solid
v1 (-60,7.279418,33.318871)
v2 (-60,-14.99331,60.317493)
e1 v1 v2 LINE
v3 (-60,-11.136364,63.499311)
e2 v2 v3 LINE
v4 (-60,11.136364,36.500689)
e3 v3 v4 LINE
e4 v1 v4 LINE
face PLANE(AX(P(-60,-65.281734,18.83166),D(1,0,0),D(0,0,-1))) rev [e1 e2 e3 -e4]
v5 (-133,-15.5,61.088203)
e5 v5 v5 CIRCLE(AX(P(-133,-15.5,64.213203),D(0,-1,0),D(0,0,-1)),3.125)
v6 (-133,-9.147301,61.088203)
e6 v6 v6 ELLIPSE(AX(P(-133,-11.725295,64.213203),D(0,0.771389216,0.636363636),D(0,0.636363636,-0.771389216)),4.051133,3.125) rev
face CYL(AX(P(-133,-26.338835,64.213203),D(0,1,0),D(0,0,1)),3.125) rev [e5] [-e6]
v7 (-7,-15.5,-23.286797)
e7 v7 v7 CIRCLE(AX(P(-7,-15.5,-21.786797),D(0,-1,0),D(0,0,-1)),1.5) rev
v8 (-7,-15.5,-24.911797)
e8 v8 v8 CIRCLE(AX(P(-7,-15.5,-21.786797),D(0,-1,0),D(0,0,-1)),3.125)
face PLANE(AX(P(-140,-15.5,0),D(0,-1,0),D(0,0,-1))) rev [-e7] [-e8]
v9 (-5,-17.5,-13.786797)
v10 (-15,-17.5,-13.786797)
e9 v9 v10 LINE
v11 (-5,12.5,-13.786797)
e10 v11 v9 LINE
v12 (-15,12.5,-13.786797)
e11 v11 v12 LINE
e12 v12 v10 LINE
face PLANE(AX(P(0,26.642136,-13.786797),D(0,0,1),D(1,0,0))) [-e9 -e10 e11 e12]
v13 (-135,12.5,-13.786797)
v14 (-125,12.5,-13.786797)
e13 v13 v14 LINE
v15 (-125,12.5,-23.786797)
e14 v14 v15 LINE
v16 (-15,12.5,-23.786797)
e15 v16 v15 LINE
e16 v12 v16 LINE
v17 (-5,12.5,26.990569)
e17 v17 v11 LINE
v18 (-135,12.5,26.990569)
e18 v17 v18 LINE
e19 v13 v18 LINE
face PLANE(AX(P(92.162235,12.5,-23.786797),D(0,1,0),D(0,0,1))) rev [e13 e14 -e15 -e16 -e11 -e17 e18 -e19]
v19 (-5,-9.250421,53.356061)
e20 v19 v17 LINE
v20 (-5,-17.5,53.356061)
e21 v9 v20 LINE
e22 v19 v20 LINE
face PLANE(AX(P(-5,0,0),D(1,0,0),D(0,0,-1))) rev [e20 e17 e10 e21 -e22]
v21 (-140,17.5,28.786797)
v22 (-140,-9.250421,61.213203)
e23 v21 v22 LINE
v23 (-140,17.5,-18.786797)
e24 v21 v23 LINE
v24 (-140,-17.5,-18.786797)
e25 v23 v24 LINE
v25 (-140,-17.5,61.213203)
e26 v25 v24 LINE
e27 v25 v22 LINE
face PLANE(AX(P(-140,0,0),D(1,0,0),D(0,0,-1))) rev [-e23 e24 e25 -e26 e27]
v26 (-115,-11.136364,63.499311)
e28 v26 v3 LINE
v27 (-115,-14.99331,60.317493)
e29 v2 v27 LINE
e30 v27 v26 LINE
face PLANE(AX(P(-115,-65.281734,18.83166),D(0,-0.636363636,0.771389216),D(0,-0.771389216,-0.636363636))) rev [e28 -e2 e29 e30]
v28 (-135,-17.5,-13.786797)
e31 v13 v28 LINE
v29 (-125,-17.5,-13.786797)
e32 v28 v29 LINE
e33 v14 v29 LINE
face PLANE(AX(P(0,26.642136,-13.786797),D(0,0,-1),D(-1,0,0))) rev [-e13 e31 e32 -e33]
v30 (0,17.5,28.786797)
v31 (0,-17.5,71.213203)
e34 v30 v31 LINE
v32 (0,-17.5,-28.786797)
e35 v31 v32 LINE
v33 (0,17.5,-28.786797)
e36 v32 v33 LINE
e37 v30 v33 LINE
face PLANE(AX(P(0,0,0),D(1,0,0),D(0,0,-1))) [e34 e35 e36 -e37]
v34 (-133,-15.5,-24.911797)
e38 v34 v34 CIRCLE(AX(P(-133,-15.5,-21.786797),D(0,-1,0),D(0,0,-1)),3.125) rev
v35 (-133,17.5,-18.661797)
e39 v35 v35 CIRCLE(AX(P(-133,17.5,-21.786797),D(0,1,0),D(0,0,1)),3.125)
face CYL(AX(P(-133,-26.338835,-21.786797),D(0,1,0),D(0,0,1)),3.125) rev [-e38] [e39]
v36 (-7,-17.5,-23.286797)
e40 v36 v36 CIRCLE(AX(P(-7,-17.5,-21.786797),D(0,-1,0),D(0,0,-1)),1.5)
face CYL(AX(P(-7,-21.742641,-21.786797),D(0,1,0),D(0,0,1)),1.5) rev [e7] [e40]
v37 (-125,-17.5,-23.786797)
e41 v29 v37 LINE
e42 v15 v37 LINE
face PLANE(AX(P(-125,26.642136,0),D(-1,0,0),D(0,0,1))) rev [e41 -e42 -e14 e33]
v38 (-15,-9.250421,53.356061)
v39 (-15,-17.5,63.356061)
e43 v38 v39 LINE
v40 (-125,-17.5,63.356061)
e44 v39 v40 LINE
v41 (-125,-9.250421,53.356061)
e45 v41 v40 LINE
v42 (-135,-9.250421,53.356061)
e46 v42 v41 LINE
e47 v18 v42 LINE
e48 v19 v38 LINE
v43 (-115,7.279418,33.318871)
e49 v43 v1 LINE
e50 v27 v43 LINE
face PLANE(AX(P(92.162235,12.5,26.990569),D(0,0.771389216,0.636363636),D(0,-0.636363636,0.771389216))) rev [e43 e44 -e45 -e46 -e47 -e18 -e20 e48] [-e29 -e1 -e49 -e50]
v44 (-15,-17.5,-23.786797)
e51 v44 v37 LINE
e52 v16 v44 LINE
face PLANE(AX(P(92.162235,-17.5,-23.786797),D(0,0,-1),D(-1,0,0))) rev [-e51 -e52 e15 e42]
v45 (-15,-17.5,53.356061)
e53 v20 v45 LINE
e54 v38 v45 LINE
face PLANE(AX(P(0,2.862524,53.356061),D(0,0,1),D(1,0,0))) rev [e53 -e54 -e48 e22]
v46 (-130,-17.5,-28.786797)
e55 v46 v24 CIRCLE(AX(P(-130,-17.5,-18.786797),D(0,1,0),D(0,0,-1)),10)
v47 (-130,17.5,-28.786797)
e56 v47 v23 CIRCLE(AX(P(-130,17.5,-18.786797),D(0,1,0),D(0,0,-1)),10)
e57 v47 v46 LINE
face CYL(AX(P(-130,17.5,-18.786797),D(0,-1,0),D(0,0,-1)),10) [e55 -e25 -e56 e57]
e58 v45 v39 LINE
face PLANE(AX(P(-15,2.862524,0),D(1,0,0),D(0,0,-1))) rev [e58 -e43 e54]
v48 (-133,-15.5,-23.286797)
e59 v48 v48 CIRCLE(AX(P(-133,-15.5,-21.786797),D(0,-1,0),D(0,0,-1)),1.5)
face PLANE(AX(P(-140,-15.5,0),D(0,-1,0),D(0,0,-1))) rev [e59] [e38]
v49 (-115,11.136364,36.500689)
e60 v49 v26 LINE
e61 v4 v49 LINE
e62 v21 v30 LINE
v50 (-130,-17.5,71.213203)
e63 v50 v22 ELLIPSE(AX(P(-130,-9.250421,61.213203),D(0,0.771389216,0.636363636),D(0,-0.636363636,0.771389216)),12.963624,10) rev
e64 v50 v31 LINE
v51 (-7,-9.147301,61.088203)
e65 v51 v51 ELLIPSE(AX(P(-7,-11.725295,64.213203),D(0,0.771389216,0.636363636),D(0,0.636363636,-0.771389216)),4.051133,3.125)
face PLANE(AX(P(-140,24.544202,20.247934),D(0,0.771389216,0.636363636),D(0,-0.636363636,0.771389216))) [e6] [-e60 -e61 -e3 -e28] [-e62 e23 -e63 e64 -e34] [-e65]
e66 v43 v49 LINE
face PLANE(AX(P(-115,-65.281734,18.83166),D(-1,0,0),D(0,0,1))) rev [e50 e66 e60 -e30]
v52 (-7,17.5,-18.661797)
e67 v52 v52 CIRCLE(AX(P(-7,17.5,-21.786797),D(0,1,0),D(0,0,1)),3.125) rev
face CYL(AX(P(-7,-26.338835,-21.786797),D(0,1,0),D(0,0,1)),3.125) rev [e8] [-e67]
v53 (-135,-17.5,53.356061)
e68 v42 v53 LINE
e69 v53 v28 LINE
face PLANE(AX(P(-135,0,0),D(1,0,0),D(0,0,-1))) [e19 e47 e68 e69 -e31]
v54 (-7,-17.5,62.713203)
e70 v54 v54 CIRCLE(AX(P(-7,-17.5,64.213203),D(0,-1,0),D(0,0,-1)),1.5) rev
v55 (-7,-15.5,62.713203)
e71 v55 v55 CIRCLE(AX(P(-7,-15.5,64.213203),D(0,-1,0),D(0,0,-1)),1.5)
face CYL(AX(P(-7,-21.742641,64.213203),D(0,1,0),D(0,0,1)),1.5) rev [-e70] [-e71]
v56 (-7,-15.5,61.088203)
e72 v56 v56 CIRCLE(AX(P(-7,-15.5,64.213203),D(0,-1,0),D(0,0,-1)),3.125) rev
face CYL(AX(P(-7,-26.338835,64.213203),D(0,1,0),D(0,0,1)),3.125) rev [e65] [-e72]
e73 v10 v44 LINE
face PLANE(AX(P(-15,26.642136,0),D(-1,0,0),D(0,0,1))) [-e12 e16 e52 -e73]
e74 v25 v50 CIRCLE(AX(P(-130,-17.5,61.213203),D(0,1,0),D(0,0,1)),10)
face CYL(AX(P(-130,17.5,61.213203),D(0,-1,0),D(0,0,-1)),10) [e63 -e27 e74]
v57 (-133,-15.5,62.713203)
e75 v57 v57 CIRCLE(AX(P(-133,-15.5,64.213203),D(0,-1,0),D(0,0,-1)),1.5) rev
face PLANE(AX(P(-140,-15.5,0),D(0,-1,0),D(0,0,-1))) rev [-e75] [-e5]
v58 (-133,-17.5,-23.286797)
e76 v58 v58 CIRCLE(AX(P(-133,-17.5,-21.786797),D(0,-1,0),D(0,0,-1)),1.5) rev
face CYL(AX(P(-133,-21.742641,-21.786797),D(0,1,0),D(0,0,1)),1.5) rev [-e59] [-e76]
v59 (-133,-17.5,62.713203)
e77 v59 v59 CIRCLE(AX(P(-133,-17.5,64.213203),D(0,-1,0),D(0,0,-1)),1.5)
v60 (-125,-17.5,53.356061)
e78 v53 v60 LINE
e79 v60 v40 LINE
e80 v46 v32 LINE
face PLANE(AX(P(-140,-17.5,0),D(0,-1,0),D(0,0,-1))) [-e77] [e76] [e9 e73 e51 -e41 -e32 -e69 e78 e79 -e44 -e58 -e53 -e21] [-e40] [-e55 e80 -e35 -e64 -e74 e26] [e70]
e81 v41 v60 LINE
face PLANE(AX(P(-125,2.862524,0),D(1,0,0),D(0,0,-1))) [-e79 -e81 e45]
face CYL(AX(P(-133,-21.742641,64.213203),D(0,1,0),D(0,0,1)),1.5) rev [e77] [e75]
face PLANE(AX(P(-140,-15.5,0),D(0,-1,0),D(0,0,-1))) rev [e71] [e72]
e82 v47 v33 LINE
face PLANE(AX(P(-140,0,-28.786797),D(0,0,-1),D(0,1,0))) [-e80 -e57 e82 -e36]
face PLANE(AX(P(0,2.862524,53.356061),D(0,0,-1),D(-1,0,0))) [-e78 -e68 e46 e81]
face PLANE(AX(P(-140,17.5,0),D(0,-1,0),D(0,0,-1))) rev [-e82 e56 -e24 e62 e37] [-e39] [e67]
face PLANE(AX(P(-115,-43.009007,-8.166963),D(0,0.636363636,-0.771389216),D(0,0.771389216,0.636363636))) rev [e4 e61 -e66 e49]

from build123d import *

# Parameters (mm, degrees)
SKETCH2_W               = 57.573593128
SKETCH2_H               = 35
BOSS_EXTRUDE1_DEPTH     = 140
CUT_EXTRUDE1_DEPTH      = 65
CUT_EXTRUDE1_DEPTH_BACK = 65
SKETCH4_W               = 55
SKETCH4_H               = 35
CUT_EXTRUDE2_DEPTH      = 5
CUT_EXTRUDE3_DEPTH      = 161.923336852
BOSS_EXTRUDE2_START     = -135
BOSS_EXTRUDE2_DEPTH     = 10
BOSS_EXTRUDE2_START_2   = -15
BOSS_EXTRUDE2_2_DEPTH   = 10
SKETCH8_3_W             = 10
SKETCH8_3_H             = 10
BOSS_EXTRUDE3_DEPTH     = 30
SKETCH7_R               = 3.125
SKETCH7_R_2             = 1.5
CUT_EXTRUDE5_DEPTH      = 33
SKETCH7_4_R             = 1.5
CUT_EXTRUDE6_DEPTH      = 35


# Read off the part's stored shape, not the designer's step: Boss-Extrude2
with BuildPart() as part:
    # Sketch2 → Boss-Extrude1 (new body)
    with BuildSketch(Plane(origin=(0, 0, 0), x_dir=(0, 0, -1), z_dir=(1, 0, 0))):
        Polygon((-28.786796564, 17.5), (-71.213203436, -17.5), (-28.786796564, -17.5), align=None)
        Rectangle(SKETCH2_W, SKETCH2_H)
        Polygon((-26.990568975, 12.5), (-28.786796564, 11.018187839), (-28.786796564, -17.5), (23.786796564, -17.5), (23.786796564, 12.5), align=None)
        Polygon((-28.786796564, -17.5), (-28.786796564, 11.018187839), (-63.356060578, -17.5), align=None)
    extrude(amount=-BOSS_EXTRUDE1_DEPTH)

    # Sketch3 → Cut-Extrude1 (cut, two sides: drawn at the far end of the back side and taken through both)
    with BuildSketch(Plane.ZY.offset(70).offset(-CUT_EXTRUDE1_DEPTH_BACK)):
        Polygon((-23.786796564, -17.5), (-23.786796564, 12.5), (26.990568975, 12.5), (63.356060578, -17.5), align=None)
    extrude(amount=CUT_EXTRUDE1_DEPTH + CUT_EXTRUDE1_DEPTH_BACK, mode=Mode.SUBTRACT)

    # Sketch4 → Cut-Extrude2 (cut)
    with BuildSketch(Plane(origin=(0, 24.544202322, 20.247933884), x_dir=(1, 0, 0), z_dir=(0, 0.77138921583987, 0.6363636363636365))):
        with Locations((-87.5, -38.569460792)):
            Rectangle(SKETCH4_W, SKETCH4_H)
    extrude(amount=-CUT_EXTRUDE2_DEPTH, mode=Mode.SUBTRACT)

    # Sketch6 → Cut-Extrude3 (cut, through all)
    with BuildSketch(Plane.XZ.offset(17.5)):
        with BuildLine():
            Line((-140, 61.213203436), (-140, 71.213203436))
            Line((-140, 71.213203436), (-130, 71.213203436))
            ThreePointArc((-130, 71.213203436), (-137.071067812, 68.284271247), (-140, 61.213203436))
        make_face()
        with BuildLine():
            Line((-140, -18.786796564), (-140, -28.786796564))
            Line((-140, -28.786796564), (-130, -28.786796564))
            ThreePointArc((-130, -28.786796564), (-137.071067812, -25.857864376), (-140, -18.786796564))
        make_face()
    extrude(amount=-CUT_EXTRUDE3_DEPTH, mode=Mode.SUBTRACT)

    # Boss-Extrude2 outline → Boss-Extrude2 (add)
    with BuildSketch(Plane.YZ.offset(BOSS_EXTRUDE2_START)):
        Polygon((-9.250420886, 53.356060578), (-17.5, 63.356060578), (-17.5, 53.356060578), align=None)
    extrude(amount=BOSS_EXTRUDE2_DEPTH)

    # Boss-Extrude2 2 outline → Boss-Extrude2 2 (add)
    with BuildSketch(Plane.YZ.offset(BOSS_EXTRUDE2_START_2)):
        Polygon((-9.250420886, 53.356060578), (-17.5, 63.356060578), (-17.5, 53.356060578), align=None)
    extrude(amount=BOSS_EXTRUDE2_2_DEPTH)

    # Sketch8<3> → Boss-Extrude3 (add)
    with BuildSketch(Plane.XZ.offset(17.5)):
        with Locations((-130, -18.786796564)):
            Rectangle(SKETCH8_3_W, SKETCH8_3_H)
        with Locations((-10, -18.786796564)):
            Rectangle(SKETCH8_3_W, SKETCH8_3_H)
    extrude(amount=-BOSS_EXTRUDE3_DEPTH)

    # Sketch7 → Cut-Extrude5 (cut)
    # profile 1 of 4: a face of its own
    with BuildSketch(Plane(origin=(0, 17.5, 0), x_dir=(1, 0, 0), z_dir=(0, 1, 0))):
        with Locations(Location((-133, 21.786796564, 0), (0, 0, 270))):
            Circle(SKETCH7_R)
        with Locations(Location((-133, 21.786796564, 0), (0, 0, 270))):
            Circle(SKETCH7_R_2, mode=Mode.SUBTRACT)
    # profile 2 of 4: a face of its own
    with BuildSketch(Plane(origin=(0, 17.5, 0), x_dir=(1, 0, 0), z_dir=(0, 1, 0))):
        with Locations(Location((-7, 21.786796564, 0), (0, 0, 270))):
            Circle(SKETCH7_R)
        with Locations(Location((-7, 21.786796564, 0), (0, 0, 270))):
            Circle(SKETCH7_R_2, mode=Mode.SUBTRACT)
    # profile 3 of 4: a face of its own
    with BuildSketch(Plane(origin=(0, 17.5, 0), x_dir=(1, 0, 0), z_dir=(0, 1, 0))):
        with Locations(Location((-7, -64.213203436, 0), (0, 0, 90))):
            Circle(SKETCH7_R)
        with Locations(Location((-7, -64.213203436, 0), (0, 0, 90))):
            Circle(SKETCH7_R_2, mode=Mode.SUBTRACT)
    # profile 4 of 4: a face of its own
    with BuildSketch(Plane(origin=(0, 17.5, 0), x_dir=(1, 0, 0), z_dir=(0, 1, 0))):
        with Locations(Location((-133, -64.213203436, 0), (0, 0, 90))):
            Circle(SKETCH7_R)
        with Locations(Location((-133, -64.213203436, 0), (0, 0, 90))):
            Circle(SKETCH7_R_2, mode=Mode.SUBTRACT)
    extrude(amount=-CUT_EXTRUDE5_DEPTH, mode=Mode.SUBTRACT)

    # Sketch7<4> → Cut-Extrude6 (cut)
    with BuildSketch(Plane(origin=(0, 17.5, 0), x_dir=(1, 0, 0), z_dir=(0, 1, 0))):
        with Locations(Location((-133, -64.213203436, 0), (0, 0, 90))):
            Circle(SKETCH7_4_R)
        with Locations(Location((-133, 21.786796564, 0), (0, 0, 90))):
            Circle(SKETCH7_4_R)
        with Locations(Location((-7, 21.786796564, 0), (0, 0, 90))):
            Circle(SKETCH7_4_R)
        with Locations(Location((-7, -64.213203436, 0), (0, 0, 90))):
            Circle(SKETCH7_4_R)
    extrude(amount=-CUT_EXTRUDE6_DEPTH, mode=Mode.SUBTRACT)


solid = part.part
